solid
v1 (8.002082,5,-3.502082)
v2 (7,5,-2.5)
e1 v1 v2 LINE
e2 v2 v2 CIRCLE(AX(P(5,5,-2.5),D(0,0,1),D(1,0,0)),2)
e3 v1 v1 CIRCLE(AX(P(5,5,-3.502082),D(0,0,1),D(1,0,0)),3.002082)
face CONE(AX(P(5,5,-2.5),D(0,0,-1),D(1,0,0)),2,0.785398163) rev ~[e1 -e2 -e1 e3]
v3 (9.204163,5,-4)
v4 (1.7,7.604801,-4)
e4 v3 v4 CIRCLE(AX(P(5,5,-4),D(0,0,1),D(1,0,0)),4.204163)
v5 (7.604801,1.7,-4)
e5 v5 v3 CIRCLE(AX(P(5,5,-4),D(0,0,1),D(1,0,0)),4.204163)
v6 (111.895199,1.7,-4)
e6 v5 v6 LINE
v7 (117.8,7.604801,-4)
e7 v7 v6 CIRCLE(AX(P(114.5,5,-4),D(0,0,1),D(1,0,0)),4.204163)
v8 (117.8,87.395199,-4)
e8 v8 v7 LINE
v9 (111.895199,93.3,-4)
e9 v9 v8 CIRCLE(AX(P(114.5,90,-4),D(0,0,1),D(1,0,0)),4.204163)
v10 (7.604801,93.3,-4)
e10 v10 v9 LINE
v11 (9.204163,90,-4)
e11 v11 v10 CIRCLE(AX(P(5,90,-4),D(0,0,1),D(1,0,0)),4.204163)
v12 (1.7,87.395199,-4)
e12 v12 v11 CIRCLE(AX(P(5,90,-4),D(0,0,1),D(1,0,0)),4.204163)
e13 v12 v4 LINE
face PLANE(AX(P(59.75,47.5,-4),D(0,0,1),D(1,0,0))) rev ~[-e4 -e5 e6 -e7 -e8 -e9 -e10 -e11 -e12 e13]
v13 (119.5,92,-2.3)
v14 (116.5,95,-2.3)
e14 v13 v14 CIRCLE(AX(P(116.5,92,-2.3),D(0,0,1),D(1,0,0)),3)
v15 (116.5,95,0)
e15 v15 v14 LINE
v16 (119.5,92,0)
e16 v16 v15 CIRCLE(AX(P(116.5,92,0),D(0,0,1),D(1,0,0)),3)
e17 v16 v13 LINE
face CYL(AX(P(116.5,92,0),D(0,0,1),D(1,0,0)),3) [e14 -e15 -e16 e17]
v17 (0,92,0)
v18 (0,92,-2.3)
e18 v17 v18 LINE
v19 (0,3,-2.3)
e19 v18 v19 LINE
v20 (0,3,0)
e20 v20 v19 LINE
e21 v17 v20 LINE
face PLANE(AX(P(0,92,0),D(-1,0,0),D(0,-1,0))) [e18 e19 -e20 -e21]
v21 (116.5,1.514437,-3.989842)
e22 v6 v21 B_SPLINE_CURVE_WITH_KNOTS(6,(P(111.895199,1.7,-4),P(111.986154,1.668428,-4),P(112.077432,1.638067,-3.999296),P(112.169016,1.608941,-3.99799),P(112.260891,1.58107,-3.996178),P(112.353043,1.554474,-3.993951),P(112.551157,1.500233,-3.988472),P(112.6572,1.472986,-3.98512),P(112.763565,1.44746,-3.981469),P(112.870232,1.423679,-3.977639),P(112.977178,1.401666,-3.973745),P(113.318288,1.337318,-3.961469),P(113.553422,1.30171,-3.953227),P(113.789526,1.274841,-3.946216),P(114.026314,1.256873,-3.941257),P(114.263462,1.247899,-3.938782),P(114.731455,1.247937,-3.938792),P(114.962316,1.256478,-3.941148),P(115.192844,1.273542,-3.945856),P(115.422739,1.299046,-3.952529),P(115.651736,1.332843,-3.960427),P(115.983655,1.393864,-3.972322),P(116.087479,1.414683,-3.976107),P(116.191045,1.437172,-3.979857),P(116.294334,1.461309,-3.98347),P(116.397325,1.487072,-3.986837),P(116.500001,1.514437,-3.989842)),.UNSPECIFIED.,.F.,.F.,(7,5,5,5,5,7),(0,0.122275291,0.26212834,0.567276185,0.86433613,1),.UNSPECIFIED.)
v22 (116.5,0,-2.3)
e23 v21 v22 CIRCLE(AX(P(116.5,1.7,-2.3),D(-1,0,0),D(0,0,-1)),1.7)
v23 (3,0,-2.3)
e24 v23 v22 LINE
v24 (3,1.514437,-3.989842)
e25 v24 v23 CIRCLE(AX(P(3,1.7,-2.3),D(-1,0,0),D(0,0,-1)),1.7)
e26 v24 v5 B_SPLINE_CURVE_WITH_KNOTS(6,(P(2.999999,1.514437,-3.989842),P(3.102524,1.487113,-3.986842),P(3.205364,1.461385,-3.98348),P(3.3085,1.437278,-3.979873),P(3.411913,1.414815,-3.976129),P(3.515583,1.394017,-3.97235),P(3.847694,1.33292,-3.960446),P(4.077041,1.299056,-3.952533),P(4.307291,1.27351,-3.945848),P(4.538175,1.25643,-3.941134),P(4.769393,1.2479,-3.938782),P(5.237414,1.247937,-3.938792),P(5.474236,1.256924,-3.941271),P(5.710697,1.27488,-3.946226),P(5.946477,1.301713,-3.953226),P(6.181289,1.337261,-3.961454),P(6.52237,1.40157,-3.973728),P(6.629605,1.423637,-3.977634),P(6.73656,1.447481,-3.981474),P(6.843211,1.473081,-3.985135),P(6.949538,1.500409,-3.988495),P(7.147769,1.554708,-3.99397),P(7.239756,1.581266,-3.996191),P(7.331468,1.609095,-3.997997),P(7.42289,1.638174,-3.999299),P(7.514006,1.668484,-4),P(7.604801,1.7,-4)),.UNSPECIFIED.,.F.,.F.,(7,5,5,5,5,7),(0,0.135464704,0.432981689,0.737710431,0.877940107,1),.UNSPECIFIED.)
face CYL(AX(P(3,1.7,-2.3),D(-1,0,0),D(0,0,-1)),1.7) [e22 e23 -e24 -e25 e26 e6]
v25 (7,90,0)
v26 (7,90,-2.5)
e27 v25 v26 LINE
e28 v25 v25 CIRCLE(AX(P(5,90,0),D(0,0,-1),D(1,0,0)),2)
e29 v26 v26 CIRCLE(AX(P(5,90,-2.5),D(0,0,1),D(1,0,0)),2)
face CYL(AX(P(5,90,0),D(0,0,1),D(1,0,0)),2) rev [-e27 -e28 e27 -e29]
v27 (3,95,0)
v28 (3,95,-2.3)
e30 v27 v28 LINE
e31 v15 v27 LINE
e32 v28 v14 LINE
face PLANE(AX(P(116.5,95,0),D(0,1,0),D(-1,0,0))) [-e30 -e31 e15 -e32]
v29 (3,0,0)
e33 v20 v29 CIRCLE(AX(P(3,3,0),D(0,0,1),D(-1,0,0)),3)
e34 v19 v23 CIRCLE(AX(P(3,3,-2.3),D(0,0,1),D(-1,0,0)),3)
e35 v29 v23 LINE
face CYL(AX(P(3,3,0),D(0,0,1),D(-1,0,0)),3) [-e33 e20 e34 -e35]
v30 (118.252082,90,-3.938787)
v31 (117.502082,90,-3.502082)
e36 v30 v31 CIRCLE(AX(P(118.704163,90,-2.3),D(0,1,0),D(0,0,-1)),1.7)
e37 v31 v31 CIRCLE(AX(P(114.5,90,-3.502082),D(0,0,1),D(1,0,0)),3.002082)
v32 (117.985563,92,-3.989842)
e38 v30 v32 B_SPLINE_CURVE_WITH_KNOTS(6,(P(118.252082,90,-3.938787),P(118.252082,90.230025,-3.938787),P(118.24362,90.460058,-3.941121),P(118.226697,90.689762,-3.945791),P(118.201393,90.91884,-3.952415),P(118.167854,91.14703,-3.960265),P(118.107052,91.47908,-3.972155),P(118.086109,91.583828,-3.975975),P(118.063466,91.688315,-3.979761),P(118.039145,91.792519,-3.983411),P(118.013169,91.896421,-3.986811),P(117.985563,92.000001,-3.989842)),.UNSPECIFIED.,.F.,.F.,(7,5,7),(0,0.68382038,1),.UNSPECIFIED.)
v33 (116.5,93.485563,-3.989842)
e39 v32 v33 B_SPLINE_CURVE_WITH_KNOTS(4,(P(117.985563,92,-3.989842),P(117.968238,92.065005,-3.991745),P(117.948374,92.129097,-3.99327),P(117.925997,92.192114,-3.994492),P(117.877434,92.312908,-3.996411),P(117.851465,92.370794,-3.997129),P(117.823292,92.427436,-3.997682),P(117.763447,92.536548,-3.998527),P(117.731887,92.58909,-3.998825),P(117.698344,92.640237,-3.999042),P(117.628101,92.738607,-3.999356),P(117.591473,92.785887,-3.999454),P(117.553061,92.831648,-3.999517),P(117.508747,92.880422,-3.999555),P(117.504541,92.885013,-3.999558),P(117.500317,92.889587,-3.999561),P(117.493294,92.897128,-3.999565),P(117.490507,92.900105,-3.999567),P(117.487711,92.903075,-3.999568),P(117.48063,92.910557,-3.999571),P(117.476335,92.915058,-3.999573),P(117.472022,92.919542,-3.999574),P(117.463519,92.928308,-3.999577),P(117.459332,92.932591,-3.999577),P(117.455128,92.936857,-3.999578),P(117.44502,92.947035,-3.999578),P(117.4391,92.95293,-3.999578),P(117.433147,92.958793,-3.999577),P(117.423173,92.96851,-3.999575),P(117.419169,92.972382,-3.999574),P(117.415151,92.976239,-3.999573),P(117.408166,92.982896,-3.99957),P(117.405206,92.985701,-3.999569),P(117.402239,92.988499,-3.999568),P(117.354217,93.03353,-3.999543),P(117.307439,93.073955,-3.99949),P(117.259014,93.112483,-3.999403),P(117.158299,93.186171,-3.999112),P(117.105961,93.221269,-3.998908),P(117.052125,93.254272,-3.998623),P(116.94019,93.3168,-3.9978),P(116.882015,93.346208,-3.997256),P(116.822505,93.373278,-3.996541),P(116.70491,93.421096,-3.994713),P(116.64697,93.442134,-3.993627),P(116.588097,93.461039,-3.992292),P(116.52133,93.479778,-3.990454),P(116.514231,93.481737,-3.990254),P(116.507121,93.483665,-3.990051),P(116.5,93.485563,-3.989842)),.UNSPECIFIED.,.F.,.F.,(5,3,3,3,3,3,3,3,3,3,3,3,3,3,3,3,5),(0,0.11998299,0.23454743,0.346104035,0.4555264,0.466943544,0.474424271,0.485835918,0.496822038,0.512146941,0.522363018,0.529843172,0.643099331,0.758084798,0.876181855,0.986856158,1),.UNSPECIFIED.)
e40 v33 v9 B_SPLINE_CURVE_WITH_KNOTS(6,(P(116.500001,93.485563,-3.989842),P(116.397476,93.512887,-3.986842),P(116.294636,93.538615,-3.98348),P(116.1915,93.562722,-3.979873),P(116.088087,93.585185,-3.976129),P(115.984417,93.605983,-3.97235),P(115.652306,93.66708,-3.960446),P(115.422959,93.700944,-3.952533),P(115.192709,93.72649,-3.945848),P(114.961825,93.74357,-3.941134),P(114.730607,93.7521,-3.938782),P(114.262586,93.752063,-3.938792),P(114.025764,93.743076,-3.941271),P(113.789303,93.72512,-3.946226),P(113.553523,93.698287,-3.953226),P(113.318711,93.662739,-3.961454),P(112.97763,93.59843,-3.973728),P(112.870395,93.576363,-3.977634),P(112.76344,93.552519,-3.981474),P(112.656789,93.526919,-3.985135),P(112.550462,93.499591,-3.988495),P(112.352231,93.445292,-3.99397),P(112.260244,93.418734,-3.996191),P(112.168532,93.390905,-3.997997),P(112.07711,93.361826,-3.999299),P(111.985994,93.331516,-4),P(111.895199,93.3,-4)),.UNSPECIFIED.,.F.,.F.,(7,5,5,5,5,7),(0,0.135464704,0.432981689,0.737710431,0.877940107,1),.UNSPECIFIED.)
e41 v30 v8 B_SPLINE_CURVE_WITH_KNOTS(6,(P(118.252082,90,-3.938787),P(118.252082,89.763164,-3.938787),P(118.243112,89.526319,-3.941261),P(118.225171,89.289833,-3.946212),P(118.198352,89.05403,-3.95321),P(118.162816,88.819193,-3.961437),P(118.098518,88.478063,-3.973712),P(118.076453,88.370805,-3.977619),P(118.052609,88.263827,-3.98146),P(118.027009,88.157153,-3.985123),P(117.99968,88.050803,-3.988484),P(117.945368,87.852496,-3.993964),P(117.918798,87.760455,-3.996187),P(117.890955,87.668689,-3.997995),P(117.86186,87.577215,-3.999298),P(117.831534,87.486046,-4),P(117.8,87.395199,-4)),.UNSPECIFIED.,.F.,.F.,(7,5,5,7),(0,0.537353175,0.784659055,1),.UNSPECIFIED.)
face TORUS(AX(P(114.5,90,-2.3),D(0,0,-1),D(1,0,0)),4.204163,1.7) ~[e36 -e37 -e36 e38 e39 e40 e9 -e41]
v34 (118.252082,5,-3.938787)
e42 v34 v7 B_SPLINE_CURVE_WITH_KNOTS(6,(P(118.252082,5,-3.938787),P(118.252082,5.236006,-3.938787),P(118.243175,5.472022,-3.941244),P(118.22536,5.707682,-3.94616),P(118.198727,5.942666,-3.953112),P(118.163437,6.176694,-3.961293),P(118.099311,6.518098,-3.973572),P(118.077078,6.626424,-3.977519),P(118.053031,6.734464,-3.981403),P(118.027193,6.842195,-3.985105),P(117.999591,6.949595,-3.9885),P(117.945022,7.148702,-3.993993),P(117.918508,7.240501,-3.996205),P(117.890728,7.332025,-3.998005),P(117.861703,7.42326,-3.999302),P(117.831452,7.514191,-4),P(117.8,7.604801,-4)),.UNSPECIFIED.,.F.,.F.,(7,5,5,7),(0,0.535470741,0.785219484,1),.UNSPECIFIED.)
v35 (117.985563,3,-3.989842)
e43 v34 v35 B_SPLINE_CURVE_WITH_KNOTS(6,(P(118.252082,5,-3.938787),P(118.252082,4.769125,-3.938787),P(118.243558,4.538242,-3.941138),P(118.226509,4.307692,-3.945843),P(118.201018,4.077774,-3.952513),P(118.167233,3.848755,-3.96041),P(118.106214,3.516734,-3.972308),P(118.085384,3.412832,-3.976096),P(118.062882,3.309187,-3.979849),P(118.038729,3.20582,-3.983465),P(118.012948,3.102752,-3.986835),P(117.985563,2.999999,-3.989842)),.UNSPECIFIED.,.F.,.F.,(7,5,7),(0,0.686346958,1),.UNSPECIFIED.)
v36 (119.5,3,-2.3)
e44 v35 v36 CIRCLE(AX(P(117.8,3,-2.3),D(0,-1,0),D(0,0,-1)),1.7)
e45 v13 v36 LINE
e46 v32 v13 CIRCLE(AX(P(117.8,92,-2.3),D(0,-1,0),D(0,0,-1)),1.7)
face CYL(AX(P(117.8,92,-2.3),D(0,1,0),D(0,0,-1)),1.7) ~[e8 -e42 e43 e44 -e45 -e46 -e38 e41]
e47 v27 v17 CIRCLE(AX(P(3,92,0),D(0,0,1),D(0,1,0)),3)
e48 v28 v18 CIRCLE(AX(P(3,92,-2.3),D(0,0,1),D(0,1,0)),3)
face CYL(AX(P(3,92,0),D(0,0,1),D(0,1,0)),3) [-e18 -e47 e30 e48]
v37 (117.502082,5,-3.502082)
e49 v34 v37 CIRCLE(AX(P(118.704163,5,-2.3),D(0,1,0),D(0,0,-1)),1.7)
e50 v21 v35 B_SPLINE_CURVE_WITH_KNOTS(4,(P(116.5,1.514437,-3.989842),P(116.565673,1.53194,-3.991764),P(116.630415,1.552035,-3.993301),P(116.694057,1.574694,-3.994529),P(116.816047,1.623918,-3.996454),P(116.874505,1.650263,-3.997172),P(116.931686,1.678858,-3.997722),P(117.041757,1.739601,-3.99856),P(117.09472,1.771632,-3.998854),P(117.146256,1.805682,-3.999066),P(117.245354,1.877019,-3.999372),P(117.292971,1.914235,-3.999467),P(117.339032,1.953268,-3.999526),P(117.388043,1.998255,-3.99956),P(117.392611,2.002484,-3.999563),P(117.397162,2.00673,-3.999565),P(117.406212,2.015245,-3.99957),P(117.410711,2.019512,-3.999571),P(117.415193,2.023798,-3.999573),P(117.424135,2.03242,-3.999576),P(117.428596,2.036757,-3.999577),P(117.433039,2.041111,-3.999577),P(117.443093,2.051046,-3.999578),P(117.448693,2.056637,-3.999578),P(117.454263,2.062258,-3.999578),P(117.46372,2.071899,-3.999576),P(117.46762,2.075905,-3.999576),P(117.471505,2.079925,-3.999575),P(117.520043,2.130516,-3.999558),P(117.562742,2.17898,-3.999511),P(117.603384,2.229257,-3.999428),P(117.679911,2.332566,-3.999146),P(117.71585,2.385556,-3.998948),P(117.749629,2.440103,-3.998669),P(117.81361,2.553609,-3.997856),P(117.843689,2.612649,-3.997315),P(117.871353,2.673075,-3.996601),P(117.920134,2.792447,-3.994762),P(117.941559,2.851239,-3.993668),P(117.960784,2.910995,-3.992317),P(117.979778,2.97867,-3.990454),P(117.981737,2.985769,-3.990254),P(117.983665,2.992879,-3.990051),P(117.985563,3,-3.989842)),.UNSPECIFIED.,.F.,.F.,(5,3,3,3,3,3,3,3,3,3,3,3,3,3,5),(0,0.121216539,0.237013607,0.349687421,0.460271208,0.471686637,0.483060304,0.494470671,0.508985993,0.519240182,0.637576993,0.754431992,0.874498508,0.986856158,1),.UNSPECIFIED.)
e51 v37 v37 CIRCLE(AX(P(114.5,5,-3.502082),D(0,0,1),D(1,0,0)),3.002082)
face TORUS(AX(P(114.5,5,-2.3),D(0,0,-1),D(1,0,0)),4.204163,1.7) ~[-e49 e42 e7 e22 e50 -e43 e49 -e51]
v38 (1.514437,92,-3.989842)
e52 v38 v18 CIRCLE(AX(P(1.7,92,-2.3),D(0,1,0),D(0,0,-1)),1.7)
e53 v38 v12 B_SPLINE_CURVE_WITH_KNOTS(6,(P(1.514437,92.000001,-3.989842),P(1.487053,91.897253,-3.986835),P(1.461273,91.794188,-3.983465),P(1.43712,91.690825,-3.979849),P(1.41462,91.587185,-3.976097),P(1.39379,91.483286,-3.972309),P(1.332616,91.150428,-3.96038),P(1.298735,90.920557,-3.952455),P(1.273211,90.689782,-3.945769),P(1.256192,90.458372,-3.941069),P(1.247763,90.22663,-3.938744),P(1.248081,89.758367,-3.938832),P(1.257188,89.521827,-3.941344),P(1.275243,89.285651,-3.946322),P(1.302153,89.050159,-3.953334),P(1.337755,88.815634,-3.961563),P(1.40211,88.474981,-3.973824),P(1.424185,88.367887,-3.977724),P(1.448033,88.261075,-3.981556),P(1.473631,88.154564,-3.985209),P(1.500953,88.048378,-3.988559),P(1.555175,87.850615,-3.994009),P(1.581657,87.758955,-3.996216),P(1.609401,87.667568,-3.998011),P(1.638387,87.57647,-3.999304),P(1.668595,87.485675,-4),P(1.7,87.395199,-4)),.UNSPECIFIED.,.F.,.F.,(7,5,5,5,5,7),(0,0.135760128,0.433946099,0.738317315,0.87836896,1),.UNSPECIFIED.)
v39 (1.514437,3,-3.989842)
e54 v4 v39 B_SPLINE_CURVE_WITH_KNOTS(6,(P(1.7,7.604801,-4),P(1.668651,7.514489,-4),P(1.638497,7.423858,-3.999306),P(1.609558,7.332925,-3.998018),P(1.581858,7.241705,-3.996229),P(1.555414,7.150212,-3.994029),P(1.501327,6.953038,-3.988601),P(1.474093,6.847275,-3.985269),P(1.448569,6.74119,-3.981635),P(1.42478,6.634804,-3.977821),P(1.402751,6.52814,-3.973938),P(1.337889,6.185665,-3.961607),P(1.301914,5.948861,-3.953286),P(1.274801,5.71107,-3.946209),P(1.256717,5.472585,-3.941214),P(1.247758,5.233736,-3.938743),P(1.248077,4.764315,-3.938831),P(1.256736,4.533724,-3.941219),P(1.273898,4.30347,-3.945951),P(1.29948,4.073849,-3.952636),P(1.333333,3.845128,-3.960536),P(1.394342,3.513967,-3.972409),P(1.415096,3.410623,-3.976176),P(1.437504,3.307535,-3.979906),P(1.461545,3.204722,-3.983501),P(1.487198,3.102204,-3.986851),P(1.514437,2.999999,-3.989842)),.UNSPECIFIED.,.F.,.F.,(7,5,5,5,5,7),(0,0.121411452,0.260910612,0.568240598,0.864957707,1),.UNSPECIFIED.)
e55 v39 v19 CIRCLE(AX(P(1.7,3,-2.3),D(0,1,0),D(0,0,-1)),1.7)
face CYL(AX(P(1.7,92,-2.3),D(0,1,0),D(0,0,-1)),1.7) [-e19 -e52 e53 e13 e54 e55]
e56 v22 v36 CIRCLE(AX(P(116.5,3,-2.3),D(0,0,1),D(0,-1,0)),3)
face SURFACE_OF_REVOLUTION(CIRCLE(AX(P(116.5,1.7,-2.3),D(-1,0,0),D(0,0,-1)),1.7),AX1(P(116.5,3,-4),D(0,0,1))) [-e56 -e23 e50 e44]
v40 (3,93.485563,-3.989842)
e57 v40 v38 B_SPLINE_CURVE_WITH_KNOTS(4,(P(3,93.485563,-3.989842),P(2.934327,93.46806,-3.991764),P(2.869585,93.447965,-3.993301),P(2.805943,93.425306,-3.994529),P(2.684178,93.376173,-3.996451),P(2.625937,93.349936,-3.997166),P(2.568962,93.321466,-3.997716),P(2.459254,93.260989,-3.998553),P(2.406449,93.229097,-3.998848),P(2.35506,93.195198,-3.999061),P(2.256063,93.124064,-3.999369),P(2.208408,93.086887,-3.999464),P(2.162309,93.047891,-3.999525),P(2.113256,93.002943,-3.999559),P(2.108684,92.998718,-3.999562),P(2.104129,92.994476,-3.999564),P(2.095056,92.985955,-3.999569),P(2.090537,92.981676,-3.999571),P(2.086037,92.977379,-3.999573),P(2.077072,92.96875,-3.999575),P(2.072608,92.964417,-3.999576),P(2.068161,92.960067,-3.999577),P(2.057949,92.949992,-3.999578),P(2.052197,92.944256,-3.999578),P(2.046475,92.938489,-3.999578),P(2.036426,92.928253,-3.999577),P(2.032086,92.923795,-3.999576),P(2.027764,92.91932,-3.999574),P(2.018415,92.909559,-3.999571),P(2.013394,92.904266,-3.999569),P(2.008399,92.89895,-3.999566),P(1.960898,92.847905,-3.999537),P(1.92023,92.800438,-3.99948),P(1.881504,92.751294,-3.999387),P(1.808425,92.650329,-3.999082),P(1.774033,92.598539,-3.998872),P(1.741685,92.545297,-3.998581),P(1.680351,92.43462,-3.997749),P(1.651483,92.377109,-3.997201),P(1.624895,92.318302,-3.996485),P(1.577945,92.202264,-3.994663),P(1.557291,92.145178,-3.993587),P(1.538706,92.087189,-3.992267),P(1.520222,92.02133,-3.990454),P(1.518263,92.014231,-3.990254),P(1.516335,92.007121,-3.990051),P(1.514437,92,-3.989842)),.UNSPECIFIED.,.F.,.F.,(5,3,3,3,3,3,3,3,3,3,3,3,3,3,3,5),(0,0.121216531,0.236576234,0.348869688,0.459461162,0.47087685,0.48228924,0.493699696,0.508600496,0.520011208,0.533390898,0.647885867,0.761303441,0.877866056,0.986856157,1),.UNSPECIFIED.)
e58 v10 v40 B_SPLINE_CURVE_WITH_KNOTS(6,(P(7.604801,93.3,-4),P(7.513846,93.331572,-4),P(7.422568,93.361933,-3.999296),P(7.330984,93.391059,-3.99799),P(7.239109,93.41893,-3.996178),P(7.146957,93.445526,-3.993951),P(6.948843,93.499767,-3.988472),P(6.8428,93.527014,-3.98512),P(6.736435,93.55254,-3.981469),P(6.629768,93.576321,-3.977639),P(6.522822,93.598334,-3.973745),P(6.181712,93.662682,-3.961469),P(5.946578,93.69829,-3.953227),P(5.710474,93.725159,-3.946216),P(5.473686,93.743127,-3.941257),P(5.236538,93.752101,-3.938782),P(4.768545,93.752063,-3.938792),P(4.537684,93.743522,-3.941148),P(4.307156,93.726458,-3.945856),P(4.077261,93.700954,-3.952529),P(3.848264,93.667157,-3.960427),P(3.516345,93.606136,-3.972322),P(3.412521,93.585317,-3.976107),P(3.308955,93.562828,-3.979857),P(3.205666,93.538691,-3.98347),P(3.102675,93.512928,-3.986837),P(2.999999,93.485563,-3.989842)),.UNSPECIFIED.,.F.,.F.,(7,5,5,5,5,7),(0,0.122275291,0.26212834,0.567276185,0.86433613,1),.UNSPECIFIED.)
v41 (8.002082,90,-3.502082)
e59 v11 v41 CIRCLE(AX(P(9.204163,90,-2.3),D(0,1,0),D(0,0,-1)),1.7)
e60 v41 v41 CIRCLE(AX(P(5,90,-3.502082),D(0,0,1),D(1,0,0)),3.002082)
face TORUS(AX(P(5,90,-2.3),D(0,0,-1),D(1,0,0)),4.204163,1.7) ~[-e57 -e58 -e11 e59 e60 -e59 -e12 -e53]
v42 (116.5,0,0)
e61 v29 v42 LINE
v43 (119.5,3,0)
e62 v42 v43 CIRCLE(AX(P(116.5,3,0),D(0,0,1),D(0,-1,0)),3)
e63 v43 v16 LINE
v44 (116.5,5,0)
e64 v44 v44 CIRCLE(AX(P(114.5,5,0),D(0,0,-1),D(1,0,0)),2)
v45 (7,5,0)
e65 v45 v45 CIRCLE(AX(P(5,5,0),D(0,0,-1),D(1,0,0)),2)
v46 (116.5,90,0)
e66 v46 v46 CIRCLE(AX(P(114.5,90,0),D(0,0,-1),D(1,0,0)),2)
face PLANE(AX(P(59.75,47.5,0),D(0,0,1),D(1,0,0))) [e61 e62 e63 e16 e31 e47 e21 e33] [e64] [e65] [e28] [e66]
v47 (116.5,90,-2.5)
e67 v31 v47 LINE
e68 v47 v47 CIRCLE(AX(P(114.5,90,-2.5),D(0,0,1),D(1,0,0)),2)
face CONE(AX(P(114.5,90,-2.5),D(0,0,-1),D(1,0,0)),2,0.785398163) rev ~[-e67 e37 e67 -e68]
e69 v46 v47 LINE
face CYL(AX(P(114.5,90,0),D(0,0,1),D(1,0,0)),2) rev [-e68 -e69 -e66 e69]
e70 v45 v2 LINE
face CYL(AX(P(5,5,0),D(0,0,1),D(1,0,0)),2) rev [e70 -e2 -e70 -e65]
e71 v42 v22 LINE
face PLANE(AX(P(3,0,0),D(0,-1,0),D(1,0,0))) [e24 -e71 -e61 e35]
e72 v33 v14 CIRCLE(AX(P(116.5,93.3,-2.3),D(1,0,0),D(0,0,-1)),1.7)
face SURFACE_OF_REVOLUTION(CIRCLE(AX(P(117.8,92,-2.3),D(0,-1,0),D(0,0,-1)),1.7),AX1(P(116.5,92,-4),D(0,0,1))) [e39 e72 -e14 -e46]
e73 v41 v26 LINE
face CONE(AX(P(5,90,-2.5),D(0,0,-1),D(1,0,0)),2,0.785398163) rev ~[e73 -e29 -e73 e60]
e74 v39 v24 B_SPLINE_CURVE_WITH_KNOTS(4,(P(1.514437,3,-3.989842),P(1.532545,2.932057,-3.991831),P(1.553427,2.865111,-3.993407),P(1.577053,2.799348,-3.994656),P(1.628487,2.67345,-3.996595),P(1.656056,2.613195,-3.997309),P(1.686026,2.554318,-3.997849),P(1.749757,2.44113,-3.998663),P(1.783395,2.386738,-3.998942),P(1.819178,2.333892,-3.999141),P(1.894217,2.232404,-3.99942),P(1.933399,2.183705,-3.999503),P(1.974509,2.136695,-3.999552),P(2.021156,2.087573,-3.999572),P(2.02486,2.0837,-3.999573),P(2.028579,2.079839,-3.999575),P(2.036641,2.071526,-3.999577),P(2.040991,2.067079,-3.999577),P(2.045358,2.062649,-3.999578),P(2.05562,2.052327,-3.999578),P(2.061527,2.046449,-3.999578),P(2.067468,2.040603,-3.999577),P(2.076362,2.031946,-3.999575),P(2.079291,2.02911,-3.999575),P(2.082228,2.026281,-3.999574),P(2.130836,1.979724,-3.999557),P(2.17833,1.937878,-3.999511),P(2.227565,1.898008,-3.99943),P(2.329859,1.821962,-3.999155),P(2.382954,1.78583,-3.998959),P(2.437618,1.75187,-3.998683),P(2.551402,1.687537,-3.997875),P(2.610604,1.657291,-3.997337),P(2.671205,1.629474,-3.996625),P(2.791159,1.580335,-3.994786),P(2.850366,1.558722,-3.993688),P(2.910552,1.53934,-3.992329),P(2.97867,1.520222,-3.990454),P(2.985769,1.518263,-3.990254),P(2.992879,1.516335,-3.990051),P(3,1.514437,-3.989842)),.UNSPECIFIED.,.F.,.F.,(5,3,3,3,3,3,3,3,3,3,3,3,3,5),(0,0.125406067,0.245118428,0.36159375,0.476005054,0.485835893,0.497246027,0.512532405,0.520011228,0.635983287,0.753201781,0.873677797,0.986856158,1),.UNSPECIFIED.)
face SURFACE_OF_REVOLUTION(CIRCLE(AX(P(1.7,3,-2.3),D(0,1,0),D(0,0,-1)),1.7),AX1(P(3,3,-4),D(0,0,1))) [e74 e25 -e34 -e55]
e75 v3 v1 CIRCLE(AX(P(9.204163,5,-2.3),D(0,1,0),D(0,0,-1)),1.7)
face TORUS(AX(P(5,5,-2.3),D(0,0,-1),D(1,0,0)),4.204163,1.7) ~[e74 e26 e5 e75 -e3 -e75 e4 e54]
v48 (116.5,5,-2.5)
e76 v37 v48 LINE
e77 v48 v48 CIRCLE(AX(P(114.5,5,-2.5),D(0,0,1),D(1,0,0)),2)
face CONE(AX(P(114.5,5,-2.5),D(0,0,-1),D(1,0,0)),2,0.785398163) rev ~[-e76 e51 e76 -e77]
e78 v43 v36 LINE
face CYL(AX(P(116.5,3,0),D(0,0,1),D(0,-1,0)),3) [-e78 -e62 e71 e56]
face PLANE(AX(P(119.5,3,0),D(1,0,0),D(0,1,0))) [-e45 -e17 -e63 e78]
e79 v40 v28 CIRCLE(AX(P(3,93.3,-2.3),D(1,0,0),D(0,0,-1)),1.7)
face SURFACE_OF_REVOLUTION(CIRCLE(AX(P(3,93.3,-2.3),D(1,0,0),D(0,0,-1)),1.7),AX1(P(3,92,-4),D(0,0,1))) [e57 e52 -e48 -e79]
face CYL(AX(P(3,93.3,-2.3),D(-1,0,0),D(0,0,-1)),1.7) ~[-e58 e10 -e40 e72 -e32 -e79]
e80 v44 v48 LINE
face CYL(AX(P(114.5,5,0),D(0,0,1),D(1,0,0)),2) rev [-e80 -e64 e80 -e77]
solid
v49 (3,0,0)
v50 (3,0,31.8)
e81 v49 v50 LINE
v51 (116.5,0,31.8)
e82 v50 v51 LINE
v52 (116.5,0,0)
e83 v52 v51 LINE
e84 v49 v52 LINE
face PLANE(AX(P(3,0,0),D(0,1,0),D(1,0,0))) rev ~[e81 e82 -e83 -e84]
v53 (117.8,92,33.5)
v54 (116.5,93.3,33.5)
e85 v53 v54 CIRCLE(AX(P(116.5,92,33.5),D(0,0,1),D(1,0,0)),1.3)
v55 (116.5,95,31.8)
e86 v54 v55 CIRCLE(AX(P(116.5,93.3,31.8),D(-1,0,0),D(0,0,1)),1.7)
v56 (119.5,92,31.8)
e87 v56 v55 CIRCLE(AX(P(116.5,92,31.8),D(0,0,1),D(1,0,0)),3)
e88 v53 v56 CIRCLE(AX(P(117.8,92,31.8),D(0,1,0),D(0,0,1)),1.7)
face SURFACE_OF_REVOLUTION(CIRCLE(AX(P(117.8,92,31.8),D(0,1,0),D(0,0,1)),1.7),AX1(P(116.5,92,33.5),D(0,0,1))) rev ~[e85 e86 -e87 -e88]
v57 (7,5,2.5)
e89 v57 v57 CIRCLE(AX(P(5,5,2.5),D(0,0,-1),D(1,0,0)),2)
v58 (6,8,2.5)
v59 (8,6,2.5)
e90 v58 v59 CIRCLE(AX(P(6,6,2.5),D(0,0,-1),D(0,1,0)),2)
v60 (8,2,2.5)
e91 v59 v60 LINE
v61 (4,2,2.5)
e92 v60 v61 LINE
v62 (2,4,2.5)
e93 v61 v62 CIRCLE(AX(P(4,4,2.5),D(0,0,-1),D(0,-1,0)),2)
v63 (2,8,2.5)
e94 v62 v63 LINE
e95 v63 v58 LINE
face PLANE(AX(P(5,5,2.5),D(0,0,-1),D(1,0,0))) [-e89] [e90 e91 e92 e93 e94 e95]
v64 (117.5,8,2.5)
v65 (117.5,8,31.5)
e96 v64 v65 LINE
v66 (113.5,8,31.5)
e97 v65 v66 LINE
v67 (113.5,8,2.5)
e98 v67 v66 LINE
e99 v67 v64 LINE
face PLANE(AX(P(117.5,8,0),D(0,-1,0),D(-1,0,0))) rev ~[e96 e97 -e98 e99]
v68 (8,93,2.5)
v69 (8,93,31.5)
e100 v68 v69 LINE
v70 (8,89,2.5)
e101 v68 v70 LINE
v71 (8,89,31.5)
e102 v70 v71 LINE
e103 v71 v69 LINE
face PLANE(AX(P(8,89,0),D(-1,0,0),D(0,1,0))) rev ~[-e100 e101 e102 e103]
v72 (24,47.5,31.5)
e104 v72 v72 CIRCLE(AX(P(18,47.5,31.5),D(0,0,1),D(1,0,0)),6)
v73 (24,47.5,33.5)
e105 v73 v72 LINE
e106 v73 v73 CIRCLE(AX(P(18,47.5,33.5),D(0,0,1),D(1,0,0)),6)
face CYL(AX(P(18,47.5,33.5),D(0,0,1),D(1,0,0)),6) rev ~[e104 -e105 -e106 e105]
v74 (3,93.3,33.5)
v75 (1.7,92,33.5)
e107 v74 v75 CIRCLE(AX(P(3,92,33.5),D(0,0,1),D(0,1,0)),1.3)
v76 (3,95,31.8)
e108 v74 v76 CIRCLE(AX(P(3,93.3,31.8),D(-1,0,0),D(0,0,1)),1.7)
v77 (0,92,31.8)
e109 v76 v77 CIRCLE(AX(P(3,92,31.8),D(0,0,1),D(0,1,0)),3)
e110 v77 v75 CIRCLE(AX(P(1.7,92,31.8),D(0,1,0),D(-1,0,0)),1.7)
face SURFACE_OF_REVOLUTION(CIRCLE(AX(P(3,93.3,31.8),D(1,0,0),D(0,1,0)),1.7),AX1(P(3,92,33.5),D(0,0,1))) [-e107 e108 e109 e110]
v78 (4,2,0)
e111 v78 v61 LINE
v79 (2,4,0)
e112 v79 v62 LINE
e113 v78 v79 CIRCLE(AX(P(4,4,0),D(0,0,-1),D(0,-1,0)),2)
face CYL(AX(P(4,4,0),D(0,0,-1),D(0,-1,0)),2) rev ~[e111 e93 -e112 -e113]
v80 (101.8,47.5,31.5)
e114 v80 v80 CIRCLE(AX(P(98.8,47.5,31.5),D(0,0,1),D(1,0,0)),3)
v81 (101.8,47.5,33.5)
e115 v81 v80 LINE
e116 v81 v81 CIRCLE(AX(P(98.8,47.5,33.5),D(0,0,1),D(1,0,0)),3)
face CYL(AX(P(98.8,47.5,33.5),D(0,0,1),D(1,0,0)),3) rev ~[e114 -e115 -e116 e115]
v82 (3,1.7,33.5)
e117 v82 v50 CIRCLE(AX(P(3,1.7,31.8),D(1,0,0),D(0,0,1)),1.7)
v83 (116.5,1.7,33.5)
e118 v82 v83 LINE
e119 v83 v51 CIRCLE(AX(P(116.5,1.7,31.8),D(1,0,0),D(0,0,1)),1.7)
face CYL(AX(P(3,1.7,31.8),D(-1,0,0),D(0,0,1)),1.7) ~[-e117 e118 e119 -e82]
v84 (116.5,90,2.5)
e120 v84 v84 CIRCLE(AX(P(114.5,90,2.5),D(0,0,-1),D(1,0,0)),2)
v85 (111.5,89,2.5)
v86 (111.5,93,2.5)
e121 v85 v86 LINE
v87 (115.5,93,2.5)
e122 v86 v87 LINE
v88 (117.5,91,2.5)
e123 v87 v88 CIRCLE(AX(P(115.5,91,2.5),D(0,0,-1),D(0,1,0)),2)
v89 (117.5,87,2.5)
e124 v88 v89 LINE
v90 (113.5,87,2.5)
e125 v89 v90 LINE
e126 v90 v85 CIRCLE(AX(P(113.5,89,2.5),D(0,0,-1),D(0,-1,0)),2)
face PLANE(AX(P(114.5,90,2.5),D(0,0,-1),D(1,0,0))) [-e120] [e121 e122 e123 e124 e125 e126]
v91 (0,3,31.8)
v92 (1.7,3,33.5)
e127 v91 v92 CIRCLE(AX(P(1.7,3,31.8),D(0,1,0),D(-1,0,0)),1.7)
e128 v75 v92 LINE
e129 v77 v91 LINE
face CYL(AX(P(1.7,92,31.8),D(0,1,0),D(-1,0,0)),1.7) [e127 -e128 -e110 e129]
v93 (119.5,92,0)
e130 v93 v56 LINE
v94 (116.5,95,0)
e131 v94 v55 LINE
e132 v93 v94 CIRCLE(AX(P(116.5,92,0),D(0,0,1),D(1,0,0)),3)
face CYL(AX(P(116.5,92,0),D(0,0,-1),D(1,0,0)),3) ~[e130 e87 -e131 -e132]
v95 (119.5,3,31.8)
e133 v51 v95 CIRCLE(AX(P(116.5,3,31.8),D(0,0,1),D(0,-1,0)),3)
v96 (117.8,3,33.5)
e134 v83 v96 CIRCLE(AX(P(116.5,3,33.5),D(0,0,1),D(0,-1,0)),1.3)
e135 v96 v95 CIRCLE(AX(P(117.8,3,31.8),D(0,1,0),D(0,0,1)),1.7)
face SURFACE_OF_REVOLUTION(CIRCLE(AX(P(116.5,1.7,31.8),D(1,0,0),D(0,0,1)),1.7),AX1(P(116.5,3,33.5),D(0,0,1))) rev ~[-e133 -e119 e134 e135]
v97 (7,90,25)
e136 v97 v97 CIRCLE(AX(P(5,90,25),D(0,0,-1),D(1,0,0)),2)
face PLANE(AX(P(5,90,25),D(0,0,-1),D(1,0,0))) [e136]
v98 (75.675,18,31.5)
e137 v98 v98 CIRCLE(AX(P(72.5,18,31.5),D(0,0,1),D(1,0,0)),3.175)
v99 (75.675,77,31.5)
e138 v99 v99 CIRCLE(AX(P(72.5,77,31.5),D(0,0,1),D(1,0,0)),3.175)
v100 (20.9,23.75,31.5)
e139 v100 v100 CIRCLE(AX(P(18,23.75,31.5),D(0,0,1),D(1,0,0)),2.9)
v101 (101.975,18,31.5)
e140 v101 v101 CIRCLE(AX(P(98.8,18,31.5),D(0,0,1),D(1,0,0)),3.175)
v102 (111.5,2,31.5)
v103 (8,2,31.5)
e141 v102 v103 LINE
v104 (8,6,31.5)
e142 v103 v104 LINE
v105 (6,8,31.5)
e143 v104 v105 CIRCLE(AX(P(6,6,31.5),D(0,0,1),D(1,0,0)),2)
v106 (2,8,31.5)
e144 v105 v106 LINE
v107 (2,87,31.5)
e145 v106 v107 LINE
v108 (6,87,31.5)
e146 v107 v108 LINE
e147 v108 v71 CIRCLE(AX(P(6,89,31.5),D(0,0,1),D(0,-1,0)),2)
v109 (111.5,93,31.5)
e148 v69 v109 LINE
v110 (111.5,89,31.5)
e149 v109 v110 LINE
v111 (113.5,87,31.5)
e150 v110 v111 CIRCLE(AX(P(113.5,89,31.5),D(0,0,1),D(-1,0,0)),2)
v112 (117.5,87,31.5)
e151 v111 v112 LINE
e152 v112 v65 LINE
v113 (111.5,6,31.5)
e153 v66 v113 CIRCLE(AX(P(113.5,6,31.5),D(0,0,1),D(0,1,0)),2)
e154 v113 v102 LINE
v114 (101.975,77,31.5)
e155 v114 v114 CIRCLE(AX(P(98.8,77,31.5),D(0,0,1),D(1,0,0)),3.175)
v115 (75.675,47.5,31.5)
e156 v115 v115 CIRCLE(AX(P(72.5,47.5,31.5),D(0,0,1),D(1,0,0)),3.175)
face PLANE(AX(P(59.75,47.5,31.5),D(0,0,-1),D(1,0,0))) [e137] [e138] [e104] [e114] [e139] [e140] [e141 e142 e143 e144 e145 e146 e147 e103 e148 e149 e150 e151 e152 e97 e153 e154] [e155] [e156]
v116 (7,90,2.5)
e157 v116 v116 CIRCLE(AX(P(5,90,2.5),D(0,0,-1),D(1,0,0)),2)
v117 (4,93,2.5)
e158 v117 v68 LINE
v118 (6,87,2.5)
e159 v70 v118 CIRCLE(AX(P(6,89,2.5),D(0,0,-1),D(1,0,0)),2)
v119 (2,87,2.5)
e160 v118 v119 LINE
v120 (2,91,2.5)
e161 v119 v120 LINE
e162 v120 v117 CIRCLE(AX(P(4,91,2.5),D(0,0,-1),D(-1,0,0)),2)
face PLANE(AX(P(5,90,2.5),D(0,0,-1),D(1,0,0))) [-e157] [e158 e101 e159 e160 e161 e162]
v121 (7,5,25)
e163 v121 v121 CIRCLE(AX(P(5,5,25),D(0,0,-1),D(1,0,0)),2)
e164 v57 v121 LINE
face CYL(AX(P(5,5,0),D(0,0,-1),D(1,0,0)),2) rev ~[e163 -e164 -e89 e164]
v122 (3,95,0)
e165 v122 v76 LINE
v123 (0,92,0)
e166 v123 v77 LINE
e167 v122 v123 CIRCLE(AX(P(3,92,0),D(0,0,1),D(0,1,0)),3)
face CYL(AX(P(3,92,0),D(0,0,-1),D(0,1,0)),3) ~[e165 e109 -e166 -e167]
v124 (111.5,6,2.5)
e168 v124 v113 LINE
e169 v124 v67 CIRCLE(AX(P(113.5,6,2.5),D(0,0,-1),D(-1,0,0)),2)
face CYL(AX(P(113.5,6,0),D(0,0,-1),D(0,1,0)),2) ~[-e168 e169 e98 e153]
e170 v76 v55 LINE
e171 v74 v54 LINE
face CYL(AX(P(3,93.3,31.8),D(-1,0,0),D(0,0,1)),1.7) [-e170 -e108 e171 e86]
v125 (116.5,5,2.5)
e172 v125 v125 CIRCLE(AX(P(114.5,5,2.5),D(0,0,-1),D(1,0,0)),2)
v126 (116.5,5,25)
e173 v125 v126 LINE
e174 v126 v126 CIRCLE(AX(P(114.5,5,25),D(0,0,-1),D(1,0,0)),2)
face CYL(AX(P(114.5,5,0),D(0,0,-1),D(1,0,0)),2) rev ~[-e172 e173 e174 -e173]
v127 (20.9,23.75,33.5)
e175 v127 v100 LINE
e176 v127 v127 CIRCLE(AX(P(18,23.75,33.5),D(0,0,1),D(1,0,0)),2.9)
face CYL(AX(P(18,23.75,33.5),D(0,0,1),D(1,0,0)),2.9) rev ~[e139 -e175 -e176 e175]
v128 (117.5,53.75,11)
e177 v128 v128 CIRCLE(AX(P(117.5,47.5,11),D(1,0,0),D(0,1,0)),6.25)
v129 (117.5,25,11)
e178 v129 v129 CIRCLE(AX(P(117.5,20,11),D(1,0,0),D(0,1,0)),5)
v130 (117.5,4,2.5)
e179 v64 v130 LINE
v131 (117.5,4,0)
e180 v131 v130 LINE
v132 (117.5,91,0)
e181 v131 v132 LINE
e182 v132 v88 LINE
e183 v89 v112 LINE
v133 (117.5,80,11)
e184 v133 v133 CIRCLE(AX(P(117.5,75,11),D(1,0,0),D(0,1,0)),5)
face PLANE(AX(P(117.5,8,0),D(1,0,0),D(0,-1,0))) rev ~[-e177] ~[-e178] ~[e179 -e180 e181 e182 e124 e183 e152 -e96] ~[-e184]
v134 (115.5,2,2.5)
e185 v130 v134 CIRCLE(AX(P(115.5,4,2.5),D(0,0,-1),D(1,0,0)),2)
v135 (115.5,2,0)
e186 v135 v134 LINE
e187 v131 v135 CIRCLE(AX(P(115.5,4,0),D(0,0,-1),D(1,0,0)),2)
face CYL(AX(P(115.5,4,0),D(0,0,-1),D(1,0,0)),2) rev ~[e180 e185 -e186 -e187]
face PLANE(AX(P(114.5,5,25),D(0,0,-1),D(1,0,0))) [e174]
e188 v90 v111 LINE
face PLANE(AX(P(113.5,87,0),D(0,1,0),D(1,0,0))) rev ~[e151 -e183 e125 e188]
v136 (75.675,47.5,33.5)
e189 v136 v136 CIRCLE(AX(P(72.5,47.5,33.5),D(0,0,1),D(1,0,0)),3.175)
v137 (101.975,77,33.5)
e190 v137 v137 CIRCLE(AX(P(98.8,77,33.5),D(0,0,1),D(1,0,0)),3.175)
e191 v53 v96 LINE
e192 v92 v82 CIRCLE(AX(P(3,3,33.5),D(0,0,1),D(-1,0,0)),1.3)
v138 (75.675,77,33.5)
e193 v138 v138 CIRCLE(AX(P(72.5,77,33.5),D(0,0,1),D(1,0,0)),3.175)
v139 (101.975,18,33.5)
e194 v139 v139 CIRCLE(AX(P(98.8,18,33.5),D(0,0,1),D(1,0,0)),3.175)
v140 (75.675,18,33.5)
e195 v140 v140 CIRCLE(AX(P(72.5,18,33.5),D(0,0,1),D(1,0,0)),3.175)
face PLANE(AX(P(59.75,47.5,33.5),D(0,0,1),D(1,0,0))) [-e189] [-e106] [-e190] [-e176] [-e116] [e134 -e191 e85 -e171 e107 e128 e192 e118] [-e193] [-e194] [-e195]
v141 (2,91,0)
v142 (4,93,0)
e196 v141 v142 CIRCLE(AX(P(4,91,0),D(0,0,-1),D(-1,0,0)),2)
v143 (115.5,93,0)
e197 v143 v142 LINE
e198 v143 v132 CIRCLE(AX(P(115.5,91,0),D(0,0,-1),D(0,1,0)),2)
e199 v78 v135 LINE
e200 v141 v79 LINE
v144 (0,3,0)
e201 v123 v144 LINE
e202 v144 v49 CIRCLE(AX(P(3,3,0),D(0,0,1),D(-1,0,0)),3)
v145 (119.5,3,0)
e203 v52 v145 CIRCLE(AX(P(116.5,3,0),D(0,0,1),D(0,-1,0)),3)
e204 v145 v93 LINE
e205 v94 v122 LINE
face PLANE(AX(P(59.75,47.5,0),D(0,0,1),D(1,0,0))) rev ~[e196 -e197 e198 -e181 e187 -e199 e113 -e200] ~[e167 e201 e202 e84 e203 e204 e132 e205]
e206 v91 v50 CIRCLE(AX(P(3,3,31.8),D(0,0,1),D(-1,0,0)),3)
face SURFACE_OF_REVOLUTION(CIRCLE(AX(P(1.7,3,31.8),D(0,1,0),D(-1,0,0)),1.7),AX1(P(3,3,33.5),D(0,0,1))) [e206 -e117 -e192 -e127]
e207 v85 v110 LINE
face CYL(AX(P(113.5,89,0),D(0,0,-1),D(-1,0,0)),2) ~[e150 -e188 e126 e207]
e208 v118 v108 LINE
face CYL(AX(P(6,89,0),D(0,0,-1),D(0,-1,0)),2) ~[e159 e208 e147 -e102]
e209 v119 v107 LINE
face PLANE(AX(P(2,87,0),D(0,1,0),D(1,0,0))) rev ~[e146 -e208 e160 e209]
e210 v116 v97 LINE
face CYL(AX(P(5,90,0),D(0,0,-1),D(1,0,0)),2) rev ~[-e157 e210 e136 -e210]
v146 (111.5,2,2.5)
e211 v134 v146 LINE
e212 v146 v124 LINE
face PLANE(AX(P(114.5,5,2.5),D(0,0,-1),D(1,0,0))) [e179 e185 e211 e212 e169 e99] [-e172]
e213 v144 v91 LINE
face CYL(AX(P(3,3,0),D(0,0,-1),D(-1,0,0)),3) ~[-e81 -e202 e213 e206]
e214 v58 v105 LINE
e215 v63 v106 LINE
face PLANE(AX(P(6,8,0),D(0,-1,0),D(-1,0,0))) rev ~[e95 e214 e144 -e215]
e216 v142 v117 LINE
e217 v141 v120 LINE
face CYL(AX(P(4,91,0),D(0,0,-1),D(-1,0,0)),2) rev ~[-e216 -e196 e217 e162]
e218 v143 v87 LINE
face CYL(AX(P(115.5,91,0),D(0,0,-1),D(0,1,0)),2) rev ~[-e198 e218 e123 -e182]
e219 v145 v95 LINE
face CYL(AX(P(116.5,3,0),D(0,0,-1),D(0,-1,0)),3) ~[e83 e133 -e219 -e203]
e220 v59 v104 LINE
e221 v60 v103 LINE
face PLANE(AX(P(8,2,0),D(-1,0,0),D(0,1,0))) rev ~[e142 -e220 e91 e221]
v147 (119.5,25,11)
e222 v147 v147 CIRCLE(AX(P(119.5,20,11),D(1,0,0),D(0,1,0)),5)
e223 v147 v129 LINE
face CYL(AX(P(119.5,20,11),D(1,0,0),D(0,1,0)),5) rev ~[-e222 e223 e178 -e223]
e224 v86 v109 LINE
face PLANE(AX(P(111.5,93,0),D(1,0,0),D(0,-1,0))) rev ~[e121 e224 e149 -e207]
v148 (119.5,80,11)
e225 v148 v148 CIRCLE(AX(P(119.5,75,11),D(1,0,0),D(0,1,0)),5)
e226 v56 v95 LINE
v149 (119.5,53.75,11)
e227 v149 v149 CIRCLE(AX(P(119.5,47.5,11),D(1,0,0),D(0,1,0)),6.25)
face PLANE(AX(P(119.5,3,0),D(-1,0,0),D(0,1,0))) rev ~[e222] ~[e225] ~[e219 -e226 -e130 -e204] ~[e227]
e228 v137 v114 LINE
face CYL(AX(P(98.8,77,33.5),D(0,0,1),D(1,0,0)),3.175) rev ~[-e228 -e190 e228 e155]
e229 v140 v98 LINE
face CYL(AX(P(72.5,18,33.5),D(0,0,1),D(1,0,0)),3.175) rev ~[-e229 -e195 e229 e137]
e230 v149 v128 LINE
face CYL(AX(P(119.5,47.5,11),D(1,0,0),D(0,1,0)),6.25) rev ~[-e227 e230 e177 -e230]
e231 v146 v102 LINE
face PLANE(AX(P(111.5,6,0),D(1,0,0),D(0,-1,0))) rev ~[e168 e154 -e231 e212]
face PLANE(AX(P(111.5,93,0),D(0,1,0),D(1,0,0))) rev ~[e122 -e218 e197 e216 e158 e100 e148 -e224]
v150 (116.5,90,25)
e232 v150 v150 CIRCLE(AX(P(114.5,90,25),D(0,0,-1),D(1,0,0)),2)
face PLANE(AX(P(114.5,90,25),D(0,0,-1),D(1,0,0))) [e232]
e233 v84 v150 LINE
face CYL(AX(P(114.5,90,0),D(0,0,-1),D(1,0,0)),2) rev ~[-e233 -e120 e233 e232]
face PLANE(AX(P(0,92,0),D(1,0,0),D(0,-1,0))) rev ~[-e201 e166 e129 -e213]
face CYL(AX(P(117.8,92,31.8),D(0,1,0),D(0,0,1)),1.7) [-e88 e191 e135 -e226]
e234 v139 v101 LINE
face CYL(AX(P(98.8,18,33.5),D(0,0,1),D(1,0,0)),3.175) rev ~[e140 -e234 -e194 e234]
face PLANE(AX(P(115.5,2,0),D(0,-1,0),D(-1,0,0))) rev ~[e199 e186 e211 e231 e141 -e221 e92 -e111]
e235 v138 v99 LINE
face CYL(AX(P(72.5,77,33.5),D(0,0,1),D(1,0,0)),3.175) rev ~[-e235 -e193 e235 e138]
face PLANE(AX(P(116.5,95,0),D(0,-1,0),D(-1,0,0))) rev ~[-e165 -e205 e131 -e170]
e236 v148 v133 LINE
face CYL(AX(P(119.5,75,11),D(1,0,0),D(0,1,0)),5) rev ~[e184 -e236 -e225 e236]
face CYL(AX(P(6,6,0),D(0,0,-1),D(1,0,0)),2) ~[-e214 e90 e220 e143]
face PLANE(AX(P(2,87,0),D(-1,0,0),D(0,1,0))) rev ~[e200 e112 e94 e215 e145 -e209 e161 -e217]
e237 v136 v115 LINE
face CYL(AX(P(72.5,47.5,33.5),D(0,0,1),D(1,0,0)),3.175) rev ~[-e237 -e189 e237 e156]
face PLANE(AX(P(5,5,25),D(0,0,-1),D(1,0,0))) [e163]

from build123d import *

# Parameters (mm, degrees)
F1_DEPTH        = 33.5
F3_DEPTH        = 31.5
F5_DEPTH        = 2.5
F6_R            = 2
F7_DEPTH        = 25
F8_DEPTH        = 4
F9_DEPTH        = 4.001
F10_SIZE        = 1.5
F11_T1_DEPTH    = 89
F11_T3_DEPTH    = 113.5
F11_T6_ANGLE    = 90
F11_T8_ANGLE    = 90
F11_T10_ANGLE   = 90
F11_T12_ANGLE   = 90
F11_2_T1_DEPTH  = 89
F11_2_T3_DEPTH  = 113.5
F11_2_T8_ANGLE  = 90
F11_2_T10_ANGLE = 90
F11_2_T12_ANGLE = 90
F11_2_T14_ANGLE = 90
F12_R           = 3.175
F12_R_2         = 3
F12_R_3         = 6
F12_R_4         = 2.9
F13_DEPTH       = 2
F14_R           = 5
F14_R_2         = 6.25
F15_DEPTH       = 25


# Not quite as in the source:
# - a fillet or chamfer that OpenCascade refuses, or shapes differently, is made with other operations: its cross-section is extruded or revolved along the edge and cut away or added


with BuildPart() as f1:
    # F0 (on Top) → F1 (new body)
    with BuildSketch(Plane.XY):
        with BuildLine():
            ThreePointArc((0, 3), (0.8786796564, 0.8786796564), (3, 0))
            Line((3, 0), (116.5, 0))
            ThreePointArc((116.5, 0), (118.6213203436, 0.8786796564), (119.5, 3))
            Line((119.5, 3), (119.5, 92))
            ThreePointArc((119.5, 92), (118.6213203436, 94.1213203436), (116.5, 95))
            Line((116.5, 95), (3, 95))
            ThreePointArc((3, 95), (0.8786796564, 94.1213203436), (0, 92))
            Line((0, 92), (0, 3))
        make_face()
    extrude(amount=F1_DEPTH)

    # F2 (on face) → F3 (cut)
    with BuildSketch(Plane(origin=(0, 0, 0), x_dir=(1, 0, 0), z_dir=(0, 0, -1))):
        with BuildLine():
            Line((111.5, -2), (8, -2))
            Line((8, -2), (8, -6))
            ThreePointArc((8, -6), (7.4142135624, -7.4142135624), (6, -8))
            Line((6, -8), (2, -8))
            Line((2, -8), (2, -87))
            Line((2, -87), (6, -87))
            ThreePointArc((6, -87), (7.4142135624, -87.5857864376), (8, -89))
            Line((8, -89), (8, -93))
            Line((8, -93), (111.5, -93))
            Line((111.5, -93), (111.5, -89))
            ThreePointArc((111.5, -89), (112.0857864376, -87.5857864376), (113.5, -87))
            Line((113.5, -87), (117.5, -87))
            Line((117.5, -87), (117.5, -8))
            Line((117.5, -8), (113.5, -8))
            ThreePointArc((113.5, -8), (112.0857864376, -7.4142135624), (111.5, -6))
            Line((111.5, -6), (111.5, -2))
        make_face()
    extrude(amount=-F3_DEPTH, mode=Mode.SUBTRACT)

    # F4 (on face) → F5 (cut)
    with BuildSketch(Plane(origin=(0, 0, 0), x_dir=(1, 0, 0), z_dir=(0, 0, -1))):
        with BuildLine():
            Line((8, -6), (8, -2))
            Line((8, -2), (4, -2))
            ThreePointArc((4, -2), (2.5857864376, -2.5857864376), (2, -4))
            Line((2, -4), (2, -8))
            Line((2, -8), (6, -8))
            ThreePointArc((6, -8), (7.4142135624, -7.4142135624), (8, -6))
        make_face()
        with BuildLine():
            Line((115.5, -2), (111.5, -2))
            Line((111.5, -2), (111.5, -6))
            ThreePointArc((111.5, -6), (112.0857864376, -7.4142135624), (113.5, -8))
            Line((113.5, -8), (117.5, -8))
            Line((117.5, -8), (117.5, -4))
            ThreePointArc((117.5, -4), (116.9142135624, -2.5857864376), (115.5, -2))
        make_face()
        with BuildLine():
            Line((117.5, -91), (117.5, -87))
            Line((117.5, -87), (113.5, -87))
            ThreePointArc((113.5, -87), (112.0857864376, -87.5857864376), (111.5, -89))
            Line((111.5, -89), (111.5, -93))
            Line((111.5, -93), (115.5, -93))
            ThreePointArc((115.5, -93), (116.9142135624, -92.4142135624), (117.5, -91))
        make_face()
        with BuildLine():
            Line((6, -87), (2, -87))
            Line((2, -87), (2, -91))
            ThreePointArc((2, -91), (2.5857864376, -92.4142135624), (4, -93))
            Line((4, -93), (8, -93))
            Line((8, -93), (8, -89))
            ThreePointArc((8, -89), (7.4142135624, -87.5857864376), (6, -87))
        make_face()
    extrude(amount=-F5_DEPTH, mode=Mode.SUBTRACT)

    # F6 (on face) → F7 (cut)
    with BuildSketch(Plane(origin=(0, 0, 0), x_dir=(1, 0, 0), z_dir=(0, 0, -1))):
        with Locations((5, -5)):
            Circle(F6_R)
        with Locations((114.5, -5)):
            Circle(F6_R)
        with Locations((114.5, -90)):
            Circle(F6_R)
        with Locations((5, -90)):
            Circle(F6_R)
    extrude(amount=-F7_DEPTH, mode=Mode.SUBTRACT)

    # F11: fillet of radius 1.7 on 8 edges, made by hand

    # F11_s2 → F11_t1 (cut)
    with BuildSketch(Plane.XZ.offset(-92)):
        with BuildLine():
            ThreePointArc((0, 31.8), (0.497918472, 33.002081528), (1.7, 33.5))
            Line((1.7, 33.5), (0, 33.5))
            Line((0, 33.5), (0, 31.8))
        make_face()
        with BuildLine():
            ThreePointArc((117.8, 33.5), (119.002081528, 33.002081528), (119.5, 31.8))
            Line((119.5, 31.8), (119.5, 33.5))
            Line((119.5, 33.5), (117.8, 33.5))
        make_face()
    extrude(amount=F11_T1_DEPTH, mode=Mode.SUBTRACT)

    # F11_s4 → F11_t3 (cut)
    with BuildSketch(Plane.YZ.offset(3)):
        with BuildLine():
            ThreePointArc((1.7, 33.5), (0.497918472, 33.002081528), (0, 31.8))
            Line((0, 31.8), (0, 33.5))
            Line((0, 33.5), (1.7, 33.5))
        make_face()
        with BuildLine():
            ThreePointArc((93.3, 33.5), (94.502081528, 33.002081528), (95, 31.8))
            Line((95, 31.8), (95, 33.5))
            Line((95, 33.5), (93.3, 33.5))
        make_face()
    extrude(amount=F11_T3_DEPTH, mode=Mode.SUBTRACT)

    # F11_s5 → F11_t6 (revolve, cut)
    with BuildSketch(Plane.XZ.offset(-3)):
        with BuildLine():
            ThreePointArc((0, 31.8), (0.497918472, 33.002081528), (1.7, 33.5))
            Line((1.7, 33.5), (0, 33.5))
            Line((0, 33.5), (0, 31.8))
        make_face()
    revolve(axis=Axis((3, 3, 33.5), (0, 0, 1)), revolution_arc=F11_T6_ANGLE, mode=Mode.SUBTRACT)

    # F11_s7 → F11_t8 (revolve, cut)
    with BuildSketch(Plane.YZ.offset(116.5)):
        with BuildLine():
            ThreePointArc((1.7, 33.5), (0.497918472, 33.002081528), (0, 31.8))
            Line((0, 31.8), (0, 33.5))
            Line((0, 33.5), (1.7, 33.5))
        make_face()
    revolve(axis=Axis((116.5, 3, 33.5), (0, 0, 1)), revolution_arc=F11_T8_ANGLE, mode=Mode.SUBTRACT)

    # F11_s9 → F11_t10 (revolve, cut)
    with BuildSketch(Plane.XZ.offset(-92)):
        with BuildLine():
            ThreePointArc((117.8, 33.5), (119.002081528, 33.002081528), (119.5, 31.8))
            Line((119.5, 31.8), (119.5, 33.5))
            Line((119.5, 33.5), (117.8, 33.5))
        make_face()
    revolve(axis=Axis((116.5, 92, 33.5), (0, 0, 1)), revolution_arc=F11_T10_ANGLE, mode=Mode.SUBTRACT)

    # F11_s11 → F11_t12 (revolve, cut)
    with BuildSketch(Plane.YZ.offset(3)):
        with BuildLine():
            ThreePointArc((95, 31.8), (94.502081528, 33.002081528), (93.3, 33.5))
            Line((93.3, 33.5), (95, 33.5))
            Line((95, 33.5), (95, 31.8))
        make_face()
    revolve(axis=Axis((3, 92, 33.5), (0, 0, 1)), revolution_arc=F11_T12_ANGLE, mode=Mode.SUBTRACT)

    # F12 (on face) → F13 (cut, through all)
    with BuildSketch(Plane.XY.offset(33.5)):
        with Locations((72.5, 77)):
            Circle(F12_R)
        with Locations((72.5, 18)):
            Circle(F12_R)
        with Locations((72.5, 47.5)):
            Circle(F12_R)
        with Locations((98.8, 77)):
            Circle(F12_R)
        with Locations((98.8, 18)):
            Circle(F12_R)
        with Locations((98.8, 47.5)):
            Circle(F12_R_2)
        with Locations((18, 47.5)):
            Circle(F12_R_3)
        with Locations((18, 23.75)):
            Circle(F12_R_4)
    extrude(amount=-F13_DEPTH, mode=Mode.SUBTRACT)

    # F14 (on face) → F15 (cut)
    with BuildSketch(Plane.YZ.offset(119.5)):
        with Locations((20, 11)):
            Circle(F14_R)
        with Locations((75, 11)):
            Circle(F14_R)
        with Locations((47.5, 11)):
            Circle(F14_R_2)
    extrude(amount=-F15_DEPTH, mode=Mode.SUBTRACT)


with BuildPart() as f8:
    # F0 (on Top) → F8 (new body)
    with BuildSketch(Plane.XY):
        with BuildLine():
            ThreePointArc((0, 3), (0.8786796564, 0.8786796564), (3, 0))
            Line((3, 0), (116.5, 0))
            ThreePointArc((116.5, 0), (118.6213203436, 0.8786796564), (119.5, 3))
            Line((119.5, 3), (119.5, 92))
            ThreePointArc((119.5, 92), (118.6213203436, 94.1213203436), (116.5, 95))
            Line((116.5, 95), (3, 95))
            ThreePointArc((3, 95), (0.8786796564, 94.1213203436), (0, 92))
            Line((0, 92), (0, 3))
        make_face()
    extrude(amount=-F8_DEPTH)

    # F6 (on face) → F9 (cut, through all)
    with BuildSketch(Plane(origin=(0, 0, 0), x_dir=(1, 0, 0), z_dir=(0, 0, -1))):
        with Locations((5, -5)):
            Circle(F6_R)
        with Locations((114.5, -5)):
            Circle(F6_R)
        with Locations((114.5, -90)):
            Circle(F6_R)
        with Locations((5, -90)):
            Circle(F6_R)
    extrude(amount=F9_DEPTH, mode=Mode.SUBTRACT)

    # F10
    f10_edges = [f8.edges().sort_by_distance(p)[0] for p in [
        (3, 5, -4),
        (112.5, 5, -4),
        (112.5, 90, -4),
        (3, 90, -4),
    ]]
    chamfer(f10_edges, length=F10_SIZE)

    # F11#2: fillet of radius 1.7 on 12 edges, made by hand

    # F11_2_s2 → F11_2_t1 (cut)
    with BuildSketch(Plane.XZ.offset(-92)):
        with BuildLine():
            ThreePointArc((1.7, -4), (0.497918472, -3.502081528), (0, -2.3))
            Line((0, -2.3), (0, -4))
            Line((0, -4), (1.7, -4))
        make_face()
        with BuildLine():
            ThreePointArc((117.8, -4), (119.002081528, -3.502081528), (119.5, -2.3))
            Line((119.5, -2.3), (119.5, -4))
            Line((119.5, -4), (117.8, -4))
        make_face()
    extrude(amount=F11_2_T1_DEPTH, mode=Mode.SUBTRACT)

    # F11_2_s4 → F11_2_t3 (cut)
    with BuildSketch(Plane.YZ.offset(3)):
        with BuildLine():
            ThreePointArc((93.3, -4), (94.502081528, -3.502081528), (95, -2.3))
            Line((95, -2.3), (95, -4))
            Line((95, -4), (93.3, -4))
        make_face()
        with BuildLine():
            ThreePointArc((1.7, -4), (0.497918472, -3.502081528), (0, -2.3))
            Line((0, -2.3), (0, -4))
            Line((0, -4), (1.7, -4))
        make_face()
    extrude(amount=F11_2_T3_DEPTH, mode=Mode.SUBTRACT)

    # F11_2_s5 → F11_2_t6 (revolve, cut)
    with BuildSketch(Plane.XZ.offset(-5)):
        with BuildLine():
            ThreePointArc((9.204163056, -4), (8.553601221, -3.8705952053), (8.002081528, -3.502081528))
            Line((8.002081528, -3.502081528), (8.5, -4))
            Line((8.5, -4), (9.204163056, -4))
        make_face()
    revolve(axis=Axis((5, 5, -4), (0, 0, 1)), mode=Mode.SUBTRACT)

    # F11_2_s7 → F11_2_t8 (revolve, cut)
    with BuildSketch(Plane.YZ.offset(3)):
        with BuildLine():
            ThreePointArc((93.3, -4), (94.502081528, -3.502081528), (95, -2.3))
            Line((95, -2.3), (95, -4))
            Line((95, -4), (93.3, -4))
        make_face()
    revolve(axis=Axis((3, 92, -4), (0, 0, 1)), revolution_arc=F11_2_T8_ANGLE, mode=Mode.SUBTRACT)

    # F11_2_s9 → F11_2_t10 (revolve, cut)
    with BuildSketch(Plane.XZ.offset(-3)):
        with BuildLine():
            ThreePointArc((1.7, -4), (0.497918472, -3.502081528), (0, -2.3))
            Line((0, -2.3), (0, -4))
            Line((0, -4), (1.7, -4))
        make_face()
    revolve(axis=Axis((3, 3, -4), (0, 0, 1)), revolution_arc=F11_2_T10_ANGLE, mode=Mode.SUBTRACT)

    # F11_2_s11 → F11_2_t12 (revolve, cut)
    with BuildSketch(Plane.XZ.offset(-92)):
        with BuildLine():
            ThreePointArc((117.8, -4), (119.002081528, -3.502081528), (119.5, -2.3))
            Line((119.5, -2.3), (119.5, -4))
            Line((119.5, -4), (117.8, -4))
        make_face()
    revolve(axis=Axis((116.5, 92, -4), (0, 0, 1)), revolution_arc=F11_2_T12_ANGLE, mode=Mode.SUBTRACT)

    # F11_2_s13 → F11_2_t14 (revolve, cut)
    with BuildSketch(Plane.YZ.offset(116.5)):
        with BuildLine():
            ThreePointArc((1.7, -4), (0.497918472, -3.502081528), (0, -2.3))
            Line((0, -2.3), (0, -4))
            Line((0, -4), (1.7, -4))
        make_face()
    revolve(axis=Axis((116.5, 3, -4), (0, 0, 1)), revolution_arc=F11_2_T14_ANGLE, mode=Mode.SUBTRACT)

    # F11_2_s15 → F11_2_t16 (revolve, cut)
    with BuildSketch(Plane.XZ.offset(-5)):
        with BuildLine():
            ThreePointArc((118.704163056, -4), (118.053601221, -3.8705952053), (117.502081528, -3.502081528))
            Line((117.502081528, -3.502081528), (118, -4))
            Line((118, -4), (118.704163056, -4))
        make_face()
    revolve(axis=Axis((114.5, 5, -4), (0, 0, 1)), mode=Mode.SUBTRACT)

    # F11_2_s17 → F11_2_t18 (revolve, cut)
    with BuildSketch(Plane.XZ.offset(-90)):
        with BuildLine():
            ThreePointArc((118.704163056, -4), (118.053601221, -3.8705952053), (117.502081528, -3.502081528))
            Line((117.502081528, -3.502081528), (118, -4))
            Line((118, -4), (118.704163056, -4))
        make_face()
    revolve(axis=Axis((114.5, 90, -4), (0, 0, 1)), mode=Mode.SUBTRACT)

    # F11_2_s19 → F11_2_t20 (revolve, cut)
    with BuildSketch(Plane.XZ.offset(-90)):
        with BuildLine():
            ThreePointArc((9.204163056, -4), (8.553601221, -3.8705952053), (8.002081528, -3.502081528))
            Line((8.002081528, -3.502081528), (8.5, -4))
            Line((8.5, -4), (9.204163056, -4))
        make_face()
    revolve(axis=Axis((5, 90, -4), (0, 0, 1)), mode=Mode.SUBTRACT)


solid = Compound([f1.part, f8.part])
